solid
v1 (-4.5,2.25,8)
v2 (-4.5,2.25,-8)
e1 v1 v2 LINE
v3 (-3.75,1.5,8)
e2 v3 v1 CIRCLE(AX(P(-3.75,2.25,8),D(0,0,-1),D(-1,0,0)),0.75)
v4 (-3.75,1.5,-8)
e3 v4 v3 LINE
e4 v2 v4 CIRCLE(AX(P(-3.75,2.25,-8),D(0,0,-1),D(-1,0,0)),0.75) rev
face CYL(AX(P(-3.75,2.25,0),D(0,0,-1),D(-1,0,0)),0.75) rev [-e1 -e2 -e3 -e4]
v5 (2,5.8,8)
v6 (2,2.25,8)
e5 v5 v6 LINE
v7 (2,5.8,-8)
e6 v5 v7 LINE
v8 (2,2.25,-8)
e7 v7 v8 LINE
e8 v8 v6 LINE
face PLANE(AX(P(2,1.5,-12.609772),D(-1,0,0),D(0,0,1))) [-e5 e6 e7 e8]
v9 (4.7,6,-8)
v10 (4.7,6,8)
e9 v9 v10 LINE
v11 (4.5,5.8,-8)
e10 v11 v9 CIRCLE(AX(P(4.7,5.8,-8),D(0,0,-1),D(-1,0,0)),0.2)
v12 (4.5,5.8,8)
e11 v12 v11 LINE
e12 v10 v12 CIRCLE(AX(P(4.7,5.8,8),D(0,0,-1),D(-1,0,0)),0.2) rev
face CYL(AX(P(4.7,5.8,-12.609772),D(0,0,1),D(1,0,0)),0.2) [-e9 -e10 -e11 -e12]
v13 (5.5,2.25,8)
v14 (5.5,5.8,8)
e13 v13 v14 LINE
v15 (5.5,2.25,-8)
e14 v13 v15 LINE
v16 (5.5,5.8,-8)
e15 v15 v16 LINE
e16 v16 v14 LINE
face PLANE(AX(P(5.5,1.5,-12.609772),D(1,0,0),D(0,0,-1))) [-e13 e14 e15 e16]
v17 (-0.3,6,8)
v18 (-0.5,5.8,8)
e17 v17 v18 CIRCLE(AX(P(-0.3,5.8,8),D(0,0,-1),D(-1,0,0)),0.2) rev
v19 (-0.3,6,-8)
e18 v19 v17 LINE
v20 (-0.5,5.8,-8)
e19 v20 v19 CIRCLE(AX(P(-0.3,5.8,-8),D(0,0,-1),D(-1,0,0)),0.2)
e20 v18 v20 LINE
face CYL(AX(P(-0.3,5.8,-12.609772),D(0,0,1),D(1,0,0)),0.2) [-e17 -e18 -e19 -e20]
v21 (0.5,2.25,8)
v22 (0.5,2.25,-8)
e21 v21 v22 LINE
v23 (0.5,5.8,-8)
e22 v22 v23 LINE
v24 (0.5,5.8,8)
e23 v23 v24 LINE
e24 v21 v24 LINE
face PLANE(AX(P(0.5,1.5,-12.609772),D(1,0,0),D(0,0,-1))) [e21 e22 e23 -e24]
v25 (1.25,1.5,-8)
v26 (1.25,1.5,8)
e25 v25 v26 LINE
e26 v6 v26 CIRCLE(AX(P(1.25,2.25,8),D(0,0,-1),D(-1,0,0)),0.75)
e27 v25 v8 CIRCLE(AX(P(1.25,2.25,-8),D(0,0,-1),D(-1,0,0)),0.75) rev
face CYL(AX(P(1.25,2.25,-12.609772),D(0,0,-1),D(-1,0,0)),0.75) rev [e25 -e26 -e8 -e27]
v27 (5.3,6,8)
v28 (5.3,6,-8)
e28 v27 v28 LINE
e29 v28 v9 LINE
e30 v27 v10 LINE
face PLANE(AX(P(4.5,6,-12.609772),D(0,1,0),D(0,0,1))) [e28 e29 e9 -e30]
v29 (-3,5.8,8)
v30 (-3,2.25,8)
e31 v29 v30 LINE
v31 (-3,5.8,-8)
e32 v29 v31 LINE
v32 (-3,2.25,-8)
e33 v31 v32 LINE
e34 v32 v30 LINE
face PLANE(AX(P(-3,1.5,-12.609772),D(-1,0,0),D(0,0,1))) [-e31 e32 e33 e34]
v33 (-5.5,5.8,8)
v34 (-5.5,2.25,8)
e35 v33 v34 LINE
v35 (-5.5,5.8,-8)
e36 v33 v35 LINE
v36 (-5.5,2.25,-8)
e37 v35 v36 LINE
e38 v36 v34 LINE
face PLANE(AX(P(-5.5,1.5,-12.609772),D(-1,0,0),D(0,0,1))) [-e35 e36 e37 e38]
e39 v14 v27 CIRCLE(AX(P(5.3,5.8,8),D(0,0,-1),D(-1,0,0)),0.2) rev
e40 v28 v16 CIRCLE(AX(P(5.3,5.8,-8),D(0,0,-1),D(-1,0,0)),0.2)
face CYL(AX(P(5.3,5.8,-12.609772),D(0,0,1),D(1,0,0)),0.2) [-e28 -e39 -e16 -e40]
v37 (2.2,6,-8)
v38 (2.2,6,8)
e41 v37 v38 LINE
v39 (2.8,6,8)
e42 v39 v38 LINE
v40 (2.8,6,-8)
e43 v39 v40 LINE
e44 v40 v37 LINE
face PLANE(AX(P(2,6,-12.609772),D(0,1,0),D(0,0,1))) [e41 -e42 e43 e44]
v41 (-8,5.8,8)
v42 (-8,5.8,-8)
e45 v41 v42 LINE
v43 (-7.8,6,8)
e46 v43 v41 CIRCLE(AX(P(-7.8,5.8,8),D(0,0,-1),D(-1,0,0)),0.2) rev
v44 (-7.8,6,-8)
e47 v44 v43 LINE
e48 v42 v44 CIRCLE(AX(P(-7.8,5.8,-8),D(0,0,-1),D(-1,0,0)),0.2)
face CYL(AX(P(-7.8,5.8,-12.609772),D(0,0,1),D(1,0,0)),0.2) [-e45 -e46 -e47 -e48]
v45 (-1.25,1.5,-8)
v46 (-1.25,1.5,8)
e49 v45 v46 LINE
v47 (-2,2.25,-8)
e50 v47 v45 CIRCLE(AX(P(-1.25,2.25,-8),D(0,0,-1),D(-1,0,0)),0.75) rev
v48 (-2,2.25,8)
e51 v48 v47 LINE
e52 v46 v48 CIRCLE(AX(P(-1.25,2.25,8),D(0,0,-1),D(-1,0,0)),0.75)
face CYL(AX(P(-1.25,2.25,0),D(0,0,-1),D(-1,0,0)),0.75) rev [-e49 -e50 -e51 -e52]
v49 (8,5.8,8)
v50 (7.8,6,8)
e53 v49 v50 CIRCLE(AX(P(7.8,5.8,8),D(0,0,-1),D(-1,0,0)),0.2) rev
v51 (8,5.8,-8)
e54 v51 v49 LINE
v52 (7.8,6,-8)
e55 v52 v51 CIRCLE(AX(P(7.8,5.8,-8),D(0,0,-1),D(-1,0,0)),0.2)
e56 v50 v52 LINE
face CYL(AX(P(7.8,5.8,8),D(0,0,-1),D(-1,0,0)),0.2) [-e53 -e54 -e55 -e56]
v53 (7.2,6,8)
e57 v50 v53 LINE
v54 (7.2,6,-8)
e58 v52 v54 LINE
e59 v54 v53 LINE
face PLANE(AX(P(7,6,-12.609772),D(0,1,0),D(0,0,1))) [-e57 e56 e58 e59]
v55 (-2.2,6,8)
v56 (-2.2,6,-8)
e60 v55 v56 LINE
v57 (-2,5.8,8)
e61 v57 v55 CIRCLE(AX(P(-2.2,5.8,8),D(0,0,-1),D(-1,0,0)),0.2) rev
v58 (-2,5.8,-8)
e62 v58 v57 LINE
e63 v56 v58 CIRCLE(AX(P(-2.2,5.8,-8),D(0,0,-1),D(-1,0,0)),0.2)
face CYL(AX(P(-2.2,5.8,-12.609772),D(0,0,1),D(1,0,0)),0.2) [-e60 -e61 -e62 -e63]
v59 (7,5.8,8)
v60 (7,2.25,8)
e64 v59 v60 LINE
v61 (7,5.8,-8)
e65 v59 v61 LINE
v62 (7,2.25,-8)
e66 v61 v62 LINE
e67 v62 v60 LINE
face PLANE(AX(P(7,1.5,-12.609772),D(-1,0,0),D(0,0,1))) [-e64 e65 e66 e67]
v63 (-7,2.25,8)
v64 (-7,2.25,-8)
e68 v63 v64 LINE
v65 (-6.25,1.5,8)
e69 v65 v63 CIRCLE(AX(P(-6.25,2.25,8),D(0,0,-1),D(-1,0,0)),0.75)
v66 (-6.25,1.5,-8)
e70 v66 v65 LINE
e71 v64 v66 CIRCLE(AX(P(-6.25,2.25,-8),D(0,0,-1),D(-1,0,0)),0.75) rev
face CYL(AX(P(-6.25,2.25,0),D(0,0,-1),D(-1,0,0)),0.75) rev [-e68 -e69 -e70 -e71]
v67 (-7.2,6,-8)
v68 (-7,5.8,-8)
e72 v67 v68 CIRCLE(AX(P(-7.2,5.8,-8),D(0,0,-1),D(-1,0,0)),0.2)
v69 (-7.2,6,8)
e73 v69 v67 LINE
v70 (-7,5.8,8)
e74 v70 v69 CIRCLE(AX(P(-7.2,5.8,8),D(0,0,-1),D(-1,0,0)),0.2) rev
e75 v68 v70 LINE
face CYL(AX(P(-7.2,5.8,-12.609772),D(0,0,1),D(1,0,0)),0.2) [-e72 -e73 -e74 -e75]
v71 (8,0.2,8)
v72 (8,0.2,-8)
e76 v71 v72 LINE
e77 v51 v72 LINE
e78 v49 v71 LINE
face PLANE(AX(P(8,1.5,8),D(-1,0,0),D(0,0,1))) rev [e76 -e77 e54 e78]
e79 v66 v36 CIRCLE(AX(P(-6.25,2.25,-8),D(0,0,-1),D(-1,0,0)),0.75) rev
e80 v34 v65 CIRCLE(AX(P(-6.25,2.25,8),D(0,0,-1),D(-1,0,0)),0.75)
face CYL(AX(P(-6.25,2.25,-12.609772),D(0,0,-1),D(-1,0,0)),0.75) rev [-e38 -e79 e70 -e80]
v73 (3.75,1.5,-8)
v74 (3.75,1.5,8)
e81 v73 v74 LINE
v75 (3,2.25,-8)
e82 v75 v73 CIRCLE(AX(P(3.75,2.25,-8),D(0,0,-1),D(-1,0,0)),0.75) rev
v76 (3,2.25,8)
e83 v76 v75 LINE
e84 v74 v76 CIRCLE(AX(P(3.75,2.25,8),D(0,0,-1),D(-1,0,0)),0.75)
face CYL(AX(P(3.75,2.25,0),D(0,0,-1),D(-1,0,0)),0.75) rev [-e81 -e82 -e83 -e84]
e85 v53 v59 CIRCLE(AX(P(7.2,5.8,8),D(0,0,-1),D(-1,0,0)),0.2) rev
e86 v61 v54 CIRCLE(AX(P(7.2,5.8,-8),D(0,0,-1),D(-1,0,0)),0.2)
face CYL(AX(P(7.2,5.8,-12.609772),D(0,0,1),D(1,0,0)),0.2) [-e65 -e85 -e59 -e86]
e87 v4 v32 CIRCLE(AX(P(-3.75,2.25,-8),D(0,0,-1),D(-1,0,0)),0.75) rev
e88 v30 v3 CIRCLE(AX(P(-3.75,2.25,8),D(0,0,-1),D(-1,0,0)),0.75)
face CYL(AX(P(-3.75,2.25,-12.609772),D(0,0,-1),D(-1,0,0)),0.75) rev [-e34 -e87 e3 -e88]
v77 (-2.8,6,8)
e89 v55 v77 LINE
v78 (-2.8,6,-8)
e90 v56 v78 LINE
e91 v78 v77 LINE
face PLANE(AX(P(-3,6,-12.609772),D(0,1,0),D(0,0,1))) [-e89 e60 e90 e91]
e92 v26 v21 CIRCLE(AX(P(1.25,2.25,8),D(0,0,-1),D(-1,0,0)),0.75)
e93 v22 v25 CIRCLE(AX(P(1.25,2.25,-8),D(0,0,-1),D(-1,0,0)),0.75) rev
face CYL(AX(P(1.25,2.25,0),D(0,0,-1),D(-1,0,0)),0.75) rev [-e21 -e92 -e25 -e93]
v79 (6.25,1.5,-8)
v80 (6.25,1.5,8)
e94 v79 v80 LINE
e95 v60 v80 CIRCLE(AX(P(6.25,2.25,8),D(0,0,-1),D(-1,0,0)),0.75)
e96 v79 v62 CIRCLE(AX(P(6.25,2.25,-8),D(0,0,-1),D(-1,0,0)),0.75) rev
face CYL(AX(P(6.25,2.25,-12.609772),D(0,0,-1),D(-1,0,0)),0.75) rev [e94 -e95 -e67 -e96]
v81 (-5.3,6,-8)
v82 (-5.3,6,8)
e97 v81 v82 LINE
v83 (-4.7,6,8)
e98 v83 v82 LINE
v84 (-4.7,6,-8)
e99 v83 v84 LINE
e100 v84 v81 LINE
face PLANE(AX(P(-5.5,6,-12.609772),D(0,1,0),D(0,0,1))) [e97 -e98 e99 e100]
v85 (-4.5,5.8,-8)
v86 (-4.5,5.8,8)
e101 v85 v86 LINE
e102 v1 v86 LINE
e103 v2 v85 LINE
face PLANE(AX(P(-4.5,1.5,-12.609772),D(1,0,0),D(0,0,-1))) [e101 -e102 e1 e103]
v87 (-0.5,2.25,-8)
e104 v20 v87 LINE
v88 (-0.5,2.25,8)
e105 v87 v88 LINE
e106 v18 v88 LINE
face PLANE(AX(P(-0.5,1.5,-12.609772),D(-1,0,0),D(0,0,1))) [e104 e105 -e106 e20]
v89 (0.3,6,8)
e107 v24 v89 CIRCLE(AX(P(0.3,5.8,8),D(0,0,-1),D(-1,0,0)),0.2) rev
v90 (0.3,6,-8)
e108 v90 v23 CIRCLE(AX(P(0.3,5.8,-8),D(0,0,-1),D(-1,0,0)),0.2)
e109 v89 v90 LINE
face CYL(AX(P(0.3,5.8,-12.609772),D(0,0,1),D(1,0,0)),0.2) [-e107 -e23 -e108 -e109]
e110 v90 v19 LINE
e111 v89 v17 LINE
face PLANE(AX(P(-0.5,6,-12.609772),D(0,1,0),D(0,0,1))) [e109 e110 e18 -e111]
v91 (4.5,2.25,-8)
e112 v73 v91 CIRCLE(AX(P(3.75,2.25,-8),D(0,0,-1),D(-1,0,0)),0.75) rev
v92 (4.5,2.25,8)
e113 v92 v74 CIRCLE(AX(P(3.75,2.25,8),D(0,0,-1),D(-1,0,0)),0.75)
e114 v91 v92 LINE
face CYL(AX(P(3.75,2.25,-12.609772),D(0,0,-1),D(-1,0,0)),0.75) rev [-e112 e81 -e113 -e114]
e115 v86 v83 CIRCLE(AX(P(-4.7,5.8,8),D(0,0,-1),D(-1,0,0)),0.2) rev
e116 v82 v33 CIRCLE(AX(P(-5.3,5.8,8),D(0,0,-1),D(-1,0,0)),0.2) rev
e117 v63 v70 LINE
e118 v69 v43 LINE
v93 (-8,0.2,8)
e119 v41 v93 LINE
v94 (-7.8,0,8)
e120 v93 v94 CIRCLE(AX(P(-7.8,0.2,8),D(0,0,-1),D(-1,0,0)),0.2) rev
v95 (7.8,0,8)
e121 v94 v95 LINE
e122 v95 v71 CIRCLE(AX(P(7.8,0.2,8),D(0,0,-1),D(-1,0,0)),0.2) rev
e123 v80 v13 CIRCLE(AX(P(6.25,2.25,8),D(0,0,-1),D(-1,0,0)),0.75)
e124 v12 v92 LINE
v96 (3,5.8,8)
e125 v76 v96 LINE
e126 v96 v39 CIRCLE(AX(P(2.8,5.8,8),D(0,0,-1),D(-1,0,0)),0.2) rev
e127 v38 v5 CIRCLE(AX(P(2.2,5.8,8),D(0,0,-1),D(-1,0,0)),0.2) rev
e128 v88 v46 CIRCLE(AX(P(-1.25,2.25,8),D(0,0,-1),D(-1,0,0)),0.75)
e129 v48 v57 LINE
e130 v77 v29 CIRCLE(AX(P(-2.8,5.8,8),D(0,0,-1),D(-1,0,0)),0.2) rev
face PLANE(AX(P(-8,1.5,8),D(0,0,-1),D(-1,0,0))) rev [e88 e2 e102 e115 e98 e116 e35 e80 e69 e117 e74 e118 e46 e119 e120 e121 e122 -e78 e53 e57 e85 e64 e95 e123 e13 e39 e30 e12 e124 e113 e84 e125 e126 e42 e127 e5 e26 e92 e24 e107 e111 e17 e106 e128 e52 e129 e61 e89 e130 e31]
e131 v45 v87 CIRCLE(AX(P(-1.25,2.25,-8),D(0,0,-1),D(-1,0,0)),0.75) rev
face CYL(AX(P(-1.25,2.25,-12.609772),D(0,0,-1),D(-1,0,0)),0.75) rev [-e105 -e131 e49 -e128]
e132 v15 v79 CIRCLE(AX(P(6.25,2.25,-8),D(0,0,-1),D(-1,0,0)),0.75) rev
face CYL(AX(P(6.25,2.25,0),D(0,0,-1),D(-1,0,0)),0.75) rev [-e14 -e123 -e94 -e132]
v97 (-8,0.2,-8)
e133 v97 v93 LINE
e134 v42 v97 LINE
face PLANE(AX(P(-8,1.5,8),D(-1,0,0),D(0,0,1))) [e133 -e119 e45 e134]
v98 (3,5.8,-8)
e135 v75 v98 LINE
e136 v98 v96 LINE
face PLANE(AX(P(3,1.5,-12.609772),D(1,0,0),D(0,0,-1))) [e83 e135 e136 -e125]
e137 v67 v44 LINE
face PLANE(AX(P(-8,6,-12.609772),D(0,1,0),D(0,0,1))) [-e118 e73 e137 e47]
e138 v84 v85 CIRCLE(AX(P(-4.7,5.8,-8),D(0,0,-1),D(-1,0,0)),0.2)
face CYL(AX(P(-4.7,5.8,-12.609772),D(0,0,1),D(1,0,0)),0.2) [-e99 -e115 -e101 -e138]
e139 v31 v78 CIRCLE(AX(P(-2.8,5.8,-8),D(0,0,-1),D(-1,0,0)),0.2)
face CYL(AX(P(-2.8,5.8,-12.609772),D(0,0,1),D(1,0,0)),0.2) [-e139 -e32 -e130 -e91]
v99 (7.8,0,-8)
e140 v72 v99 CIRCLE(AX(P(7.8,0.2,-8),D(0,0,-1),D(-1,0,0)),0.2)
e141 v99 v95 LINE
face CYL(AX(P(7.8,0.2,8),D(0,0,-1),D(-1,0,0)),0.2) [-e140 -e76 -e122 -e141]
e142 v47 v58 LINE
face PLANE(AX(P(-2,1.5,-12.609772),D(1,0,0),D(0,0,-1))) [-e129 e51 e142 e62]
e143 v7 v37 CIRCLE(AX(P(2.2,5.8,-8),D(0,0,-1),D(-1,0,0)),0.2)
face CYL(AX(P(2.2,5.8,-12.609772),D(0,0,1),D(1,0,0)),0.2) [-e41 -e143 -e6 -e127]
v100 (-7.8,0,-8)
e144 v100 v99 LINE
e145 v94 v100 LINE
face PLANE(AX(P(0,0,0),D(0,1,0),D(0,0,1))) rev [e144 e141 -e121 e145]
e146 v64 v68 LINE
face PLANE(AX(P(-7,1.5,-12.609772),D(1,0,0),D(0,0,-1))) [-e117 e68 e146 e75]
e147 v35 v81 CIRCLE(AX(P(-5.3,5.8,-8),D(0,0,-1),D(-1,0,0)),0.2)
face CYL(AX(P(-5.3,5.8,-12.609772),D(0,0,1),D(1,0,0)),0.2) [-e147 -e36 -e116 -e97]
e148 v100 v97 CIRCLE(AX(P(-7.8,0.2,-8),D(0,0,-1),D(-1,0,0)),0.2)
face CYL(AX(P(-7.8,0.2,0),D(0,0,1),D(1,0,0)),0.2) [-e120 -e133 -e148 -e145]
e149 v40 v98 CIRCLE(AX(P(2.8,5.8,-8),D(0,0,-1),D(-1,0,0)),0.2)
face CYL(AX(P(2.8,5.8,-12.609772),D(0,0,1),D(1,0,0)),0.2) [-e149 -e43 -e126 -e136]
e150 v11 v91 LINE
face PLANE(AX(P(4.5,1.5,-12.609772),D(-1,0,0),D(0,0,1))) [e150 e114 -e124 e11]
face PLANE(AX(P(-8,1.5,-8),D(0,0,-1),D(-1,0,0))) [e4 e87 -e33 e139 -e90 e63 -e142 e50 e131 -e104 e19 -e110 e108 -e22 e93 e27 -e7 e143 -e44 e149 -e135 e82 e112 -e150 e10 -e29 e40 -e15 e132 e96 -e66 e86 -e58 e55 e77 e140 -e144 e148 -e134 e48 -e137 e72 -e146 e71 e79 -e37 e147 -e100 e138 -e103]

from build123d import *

# Parameters (mm, degrees)
SKETCH2_W           = 16
SKETCH2_H           = 16
BOSS_EXTRUDE1_DEPTH = 1.5
SKETCH3_W           = 1
SKETCH3_H           = 4.5
BOSS_EXTRUDE2_DEPTH = 16
FILLET1_R           = 0.75
FILLET2_R           = 0.2


with BuildPart() as part:
    # Sketch2 → Boss-Extrude1 (new body)
    with BuildSketch(Plane(origin=(0, 0, 0), x_dir=(1, 0, 0), z_dir=(0, 1, 0))):
        Rectangle(SKETCH2_W, SKETCH2_H)
    extrude(amount=BOSS_EXTRUDE1_DEPTH)

    # Sketch3 → Boss-Extrude2 (add)
    with BuildSketch(Plane.XY.offset(8)):
        with Locations((-7.5, 3.75)):
            Rectangle(SKETCH3_W, SKETCH3_H)
        with Locations((-5, 3.75)):
            Rectangle(SKETCH3_W, SKETCH3_H)
        with Locations((-2.5, 3.75)):
            Rectangle(SKETCH3_W, SKETCH3_H)
        with Locations((0, 3.75)):
            Rectangle(SKETCH3_W, SKETCH3_H)
        with Locations((2.5, 3.75)):
            Rectangle(SKETCH3_W, SKETCH3_H)
        with Locations((5, 3.75)):
            Rectangle(SKETCH3_W, SKETCH3_H)
        with Locations((7.5, 3.75)):
            Rectangle(SKETCH3_W, SKETCH3_H)
    extrude(amount=-BOSS_EXTRUDE2_DEPTH)

    # Fillet1
    fillet1_edges = [part.edges().sort_by_distance(p)[0] for p in [
        (7, 1.5, 0),
        (5.5, 1.5, 0),
        (4.5, 1.5, 0),
        (3, 1.5, 0),
        (2, 1.5, 0),
        (0.5, 1.5, 0),
        (-0.5, 1.5, 0),
        (-2, 1.5, 0),
        (-3, 1.5, 0),
        (-4.5, 1.5, 0),
        (-5.5, 1.5, 0),
        (-7, 1.5, 0),
    ]]
    fillet(fillet1_edges, radius=FILLET1_R - 0.0001)  # a hair under: the kernel refuses the full size

    # Fillet2
    fillet2_edges = [part.edges().sort_by_distance(p)[0] for p in [
        (-7, 6, 0),
        (-8, 6, 0),
        (-4.5, 6, 0),
        (-5.5, 6, 0),
        (-2, 6, 0),
        (-3, 6, 0),
        (0.5, 6, 0),
        (-0.5, 6, 0),
        (-8, 0, 0),
        (3, 6, 0),
        (2, 6, 0),
        (5.5, 6, 0),
        (4.5, 6, 0),
        (8, 0, 0),
        (8, 6, 0),
        (7, 6, 0),
    ]]
    fillet(fillet2_edges, radius=FILLET2_R)


solid = part.part
